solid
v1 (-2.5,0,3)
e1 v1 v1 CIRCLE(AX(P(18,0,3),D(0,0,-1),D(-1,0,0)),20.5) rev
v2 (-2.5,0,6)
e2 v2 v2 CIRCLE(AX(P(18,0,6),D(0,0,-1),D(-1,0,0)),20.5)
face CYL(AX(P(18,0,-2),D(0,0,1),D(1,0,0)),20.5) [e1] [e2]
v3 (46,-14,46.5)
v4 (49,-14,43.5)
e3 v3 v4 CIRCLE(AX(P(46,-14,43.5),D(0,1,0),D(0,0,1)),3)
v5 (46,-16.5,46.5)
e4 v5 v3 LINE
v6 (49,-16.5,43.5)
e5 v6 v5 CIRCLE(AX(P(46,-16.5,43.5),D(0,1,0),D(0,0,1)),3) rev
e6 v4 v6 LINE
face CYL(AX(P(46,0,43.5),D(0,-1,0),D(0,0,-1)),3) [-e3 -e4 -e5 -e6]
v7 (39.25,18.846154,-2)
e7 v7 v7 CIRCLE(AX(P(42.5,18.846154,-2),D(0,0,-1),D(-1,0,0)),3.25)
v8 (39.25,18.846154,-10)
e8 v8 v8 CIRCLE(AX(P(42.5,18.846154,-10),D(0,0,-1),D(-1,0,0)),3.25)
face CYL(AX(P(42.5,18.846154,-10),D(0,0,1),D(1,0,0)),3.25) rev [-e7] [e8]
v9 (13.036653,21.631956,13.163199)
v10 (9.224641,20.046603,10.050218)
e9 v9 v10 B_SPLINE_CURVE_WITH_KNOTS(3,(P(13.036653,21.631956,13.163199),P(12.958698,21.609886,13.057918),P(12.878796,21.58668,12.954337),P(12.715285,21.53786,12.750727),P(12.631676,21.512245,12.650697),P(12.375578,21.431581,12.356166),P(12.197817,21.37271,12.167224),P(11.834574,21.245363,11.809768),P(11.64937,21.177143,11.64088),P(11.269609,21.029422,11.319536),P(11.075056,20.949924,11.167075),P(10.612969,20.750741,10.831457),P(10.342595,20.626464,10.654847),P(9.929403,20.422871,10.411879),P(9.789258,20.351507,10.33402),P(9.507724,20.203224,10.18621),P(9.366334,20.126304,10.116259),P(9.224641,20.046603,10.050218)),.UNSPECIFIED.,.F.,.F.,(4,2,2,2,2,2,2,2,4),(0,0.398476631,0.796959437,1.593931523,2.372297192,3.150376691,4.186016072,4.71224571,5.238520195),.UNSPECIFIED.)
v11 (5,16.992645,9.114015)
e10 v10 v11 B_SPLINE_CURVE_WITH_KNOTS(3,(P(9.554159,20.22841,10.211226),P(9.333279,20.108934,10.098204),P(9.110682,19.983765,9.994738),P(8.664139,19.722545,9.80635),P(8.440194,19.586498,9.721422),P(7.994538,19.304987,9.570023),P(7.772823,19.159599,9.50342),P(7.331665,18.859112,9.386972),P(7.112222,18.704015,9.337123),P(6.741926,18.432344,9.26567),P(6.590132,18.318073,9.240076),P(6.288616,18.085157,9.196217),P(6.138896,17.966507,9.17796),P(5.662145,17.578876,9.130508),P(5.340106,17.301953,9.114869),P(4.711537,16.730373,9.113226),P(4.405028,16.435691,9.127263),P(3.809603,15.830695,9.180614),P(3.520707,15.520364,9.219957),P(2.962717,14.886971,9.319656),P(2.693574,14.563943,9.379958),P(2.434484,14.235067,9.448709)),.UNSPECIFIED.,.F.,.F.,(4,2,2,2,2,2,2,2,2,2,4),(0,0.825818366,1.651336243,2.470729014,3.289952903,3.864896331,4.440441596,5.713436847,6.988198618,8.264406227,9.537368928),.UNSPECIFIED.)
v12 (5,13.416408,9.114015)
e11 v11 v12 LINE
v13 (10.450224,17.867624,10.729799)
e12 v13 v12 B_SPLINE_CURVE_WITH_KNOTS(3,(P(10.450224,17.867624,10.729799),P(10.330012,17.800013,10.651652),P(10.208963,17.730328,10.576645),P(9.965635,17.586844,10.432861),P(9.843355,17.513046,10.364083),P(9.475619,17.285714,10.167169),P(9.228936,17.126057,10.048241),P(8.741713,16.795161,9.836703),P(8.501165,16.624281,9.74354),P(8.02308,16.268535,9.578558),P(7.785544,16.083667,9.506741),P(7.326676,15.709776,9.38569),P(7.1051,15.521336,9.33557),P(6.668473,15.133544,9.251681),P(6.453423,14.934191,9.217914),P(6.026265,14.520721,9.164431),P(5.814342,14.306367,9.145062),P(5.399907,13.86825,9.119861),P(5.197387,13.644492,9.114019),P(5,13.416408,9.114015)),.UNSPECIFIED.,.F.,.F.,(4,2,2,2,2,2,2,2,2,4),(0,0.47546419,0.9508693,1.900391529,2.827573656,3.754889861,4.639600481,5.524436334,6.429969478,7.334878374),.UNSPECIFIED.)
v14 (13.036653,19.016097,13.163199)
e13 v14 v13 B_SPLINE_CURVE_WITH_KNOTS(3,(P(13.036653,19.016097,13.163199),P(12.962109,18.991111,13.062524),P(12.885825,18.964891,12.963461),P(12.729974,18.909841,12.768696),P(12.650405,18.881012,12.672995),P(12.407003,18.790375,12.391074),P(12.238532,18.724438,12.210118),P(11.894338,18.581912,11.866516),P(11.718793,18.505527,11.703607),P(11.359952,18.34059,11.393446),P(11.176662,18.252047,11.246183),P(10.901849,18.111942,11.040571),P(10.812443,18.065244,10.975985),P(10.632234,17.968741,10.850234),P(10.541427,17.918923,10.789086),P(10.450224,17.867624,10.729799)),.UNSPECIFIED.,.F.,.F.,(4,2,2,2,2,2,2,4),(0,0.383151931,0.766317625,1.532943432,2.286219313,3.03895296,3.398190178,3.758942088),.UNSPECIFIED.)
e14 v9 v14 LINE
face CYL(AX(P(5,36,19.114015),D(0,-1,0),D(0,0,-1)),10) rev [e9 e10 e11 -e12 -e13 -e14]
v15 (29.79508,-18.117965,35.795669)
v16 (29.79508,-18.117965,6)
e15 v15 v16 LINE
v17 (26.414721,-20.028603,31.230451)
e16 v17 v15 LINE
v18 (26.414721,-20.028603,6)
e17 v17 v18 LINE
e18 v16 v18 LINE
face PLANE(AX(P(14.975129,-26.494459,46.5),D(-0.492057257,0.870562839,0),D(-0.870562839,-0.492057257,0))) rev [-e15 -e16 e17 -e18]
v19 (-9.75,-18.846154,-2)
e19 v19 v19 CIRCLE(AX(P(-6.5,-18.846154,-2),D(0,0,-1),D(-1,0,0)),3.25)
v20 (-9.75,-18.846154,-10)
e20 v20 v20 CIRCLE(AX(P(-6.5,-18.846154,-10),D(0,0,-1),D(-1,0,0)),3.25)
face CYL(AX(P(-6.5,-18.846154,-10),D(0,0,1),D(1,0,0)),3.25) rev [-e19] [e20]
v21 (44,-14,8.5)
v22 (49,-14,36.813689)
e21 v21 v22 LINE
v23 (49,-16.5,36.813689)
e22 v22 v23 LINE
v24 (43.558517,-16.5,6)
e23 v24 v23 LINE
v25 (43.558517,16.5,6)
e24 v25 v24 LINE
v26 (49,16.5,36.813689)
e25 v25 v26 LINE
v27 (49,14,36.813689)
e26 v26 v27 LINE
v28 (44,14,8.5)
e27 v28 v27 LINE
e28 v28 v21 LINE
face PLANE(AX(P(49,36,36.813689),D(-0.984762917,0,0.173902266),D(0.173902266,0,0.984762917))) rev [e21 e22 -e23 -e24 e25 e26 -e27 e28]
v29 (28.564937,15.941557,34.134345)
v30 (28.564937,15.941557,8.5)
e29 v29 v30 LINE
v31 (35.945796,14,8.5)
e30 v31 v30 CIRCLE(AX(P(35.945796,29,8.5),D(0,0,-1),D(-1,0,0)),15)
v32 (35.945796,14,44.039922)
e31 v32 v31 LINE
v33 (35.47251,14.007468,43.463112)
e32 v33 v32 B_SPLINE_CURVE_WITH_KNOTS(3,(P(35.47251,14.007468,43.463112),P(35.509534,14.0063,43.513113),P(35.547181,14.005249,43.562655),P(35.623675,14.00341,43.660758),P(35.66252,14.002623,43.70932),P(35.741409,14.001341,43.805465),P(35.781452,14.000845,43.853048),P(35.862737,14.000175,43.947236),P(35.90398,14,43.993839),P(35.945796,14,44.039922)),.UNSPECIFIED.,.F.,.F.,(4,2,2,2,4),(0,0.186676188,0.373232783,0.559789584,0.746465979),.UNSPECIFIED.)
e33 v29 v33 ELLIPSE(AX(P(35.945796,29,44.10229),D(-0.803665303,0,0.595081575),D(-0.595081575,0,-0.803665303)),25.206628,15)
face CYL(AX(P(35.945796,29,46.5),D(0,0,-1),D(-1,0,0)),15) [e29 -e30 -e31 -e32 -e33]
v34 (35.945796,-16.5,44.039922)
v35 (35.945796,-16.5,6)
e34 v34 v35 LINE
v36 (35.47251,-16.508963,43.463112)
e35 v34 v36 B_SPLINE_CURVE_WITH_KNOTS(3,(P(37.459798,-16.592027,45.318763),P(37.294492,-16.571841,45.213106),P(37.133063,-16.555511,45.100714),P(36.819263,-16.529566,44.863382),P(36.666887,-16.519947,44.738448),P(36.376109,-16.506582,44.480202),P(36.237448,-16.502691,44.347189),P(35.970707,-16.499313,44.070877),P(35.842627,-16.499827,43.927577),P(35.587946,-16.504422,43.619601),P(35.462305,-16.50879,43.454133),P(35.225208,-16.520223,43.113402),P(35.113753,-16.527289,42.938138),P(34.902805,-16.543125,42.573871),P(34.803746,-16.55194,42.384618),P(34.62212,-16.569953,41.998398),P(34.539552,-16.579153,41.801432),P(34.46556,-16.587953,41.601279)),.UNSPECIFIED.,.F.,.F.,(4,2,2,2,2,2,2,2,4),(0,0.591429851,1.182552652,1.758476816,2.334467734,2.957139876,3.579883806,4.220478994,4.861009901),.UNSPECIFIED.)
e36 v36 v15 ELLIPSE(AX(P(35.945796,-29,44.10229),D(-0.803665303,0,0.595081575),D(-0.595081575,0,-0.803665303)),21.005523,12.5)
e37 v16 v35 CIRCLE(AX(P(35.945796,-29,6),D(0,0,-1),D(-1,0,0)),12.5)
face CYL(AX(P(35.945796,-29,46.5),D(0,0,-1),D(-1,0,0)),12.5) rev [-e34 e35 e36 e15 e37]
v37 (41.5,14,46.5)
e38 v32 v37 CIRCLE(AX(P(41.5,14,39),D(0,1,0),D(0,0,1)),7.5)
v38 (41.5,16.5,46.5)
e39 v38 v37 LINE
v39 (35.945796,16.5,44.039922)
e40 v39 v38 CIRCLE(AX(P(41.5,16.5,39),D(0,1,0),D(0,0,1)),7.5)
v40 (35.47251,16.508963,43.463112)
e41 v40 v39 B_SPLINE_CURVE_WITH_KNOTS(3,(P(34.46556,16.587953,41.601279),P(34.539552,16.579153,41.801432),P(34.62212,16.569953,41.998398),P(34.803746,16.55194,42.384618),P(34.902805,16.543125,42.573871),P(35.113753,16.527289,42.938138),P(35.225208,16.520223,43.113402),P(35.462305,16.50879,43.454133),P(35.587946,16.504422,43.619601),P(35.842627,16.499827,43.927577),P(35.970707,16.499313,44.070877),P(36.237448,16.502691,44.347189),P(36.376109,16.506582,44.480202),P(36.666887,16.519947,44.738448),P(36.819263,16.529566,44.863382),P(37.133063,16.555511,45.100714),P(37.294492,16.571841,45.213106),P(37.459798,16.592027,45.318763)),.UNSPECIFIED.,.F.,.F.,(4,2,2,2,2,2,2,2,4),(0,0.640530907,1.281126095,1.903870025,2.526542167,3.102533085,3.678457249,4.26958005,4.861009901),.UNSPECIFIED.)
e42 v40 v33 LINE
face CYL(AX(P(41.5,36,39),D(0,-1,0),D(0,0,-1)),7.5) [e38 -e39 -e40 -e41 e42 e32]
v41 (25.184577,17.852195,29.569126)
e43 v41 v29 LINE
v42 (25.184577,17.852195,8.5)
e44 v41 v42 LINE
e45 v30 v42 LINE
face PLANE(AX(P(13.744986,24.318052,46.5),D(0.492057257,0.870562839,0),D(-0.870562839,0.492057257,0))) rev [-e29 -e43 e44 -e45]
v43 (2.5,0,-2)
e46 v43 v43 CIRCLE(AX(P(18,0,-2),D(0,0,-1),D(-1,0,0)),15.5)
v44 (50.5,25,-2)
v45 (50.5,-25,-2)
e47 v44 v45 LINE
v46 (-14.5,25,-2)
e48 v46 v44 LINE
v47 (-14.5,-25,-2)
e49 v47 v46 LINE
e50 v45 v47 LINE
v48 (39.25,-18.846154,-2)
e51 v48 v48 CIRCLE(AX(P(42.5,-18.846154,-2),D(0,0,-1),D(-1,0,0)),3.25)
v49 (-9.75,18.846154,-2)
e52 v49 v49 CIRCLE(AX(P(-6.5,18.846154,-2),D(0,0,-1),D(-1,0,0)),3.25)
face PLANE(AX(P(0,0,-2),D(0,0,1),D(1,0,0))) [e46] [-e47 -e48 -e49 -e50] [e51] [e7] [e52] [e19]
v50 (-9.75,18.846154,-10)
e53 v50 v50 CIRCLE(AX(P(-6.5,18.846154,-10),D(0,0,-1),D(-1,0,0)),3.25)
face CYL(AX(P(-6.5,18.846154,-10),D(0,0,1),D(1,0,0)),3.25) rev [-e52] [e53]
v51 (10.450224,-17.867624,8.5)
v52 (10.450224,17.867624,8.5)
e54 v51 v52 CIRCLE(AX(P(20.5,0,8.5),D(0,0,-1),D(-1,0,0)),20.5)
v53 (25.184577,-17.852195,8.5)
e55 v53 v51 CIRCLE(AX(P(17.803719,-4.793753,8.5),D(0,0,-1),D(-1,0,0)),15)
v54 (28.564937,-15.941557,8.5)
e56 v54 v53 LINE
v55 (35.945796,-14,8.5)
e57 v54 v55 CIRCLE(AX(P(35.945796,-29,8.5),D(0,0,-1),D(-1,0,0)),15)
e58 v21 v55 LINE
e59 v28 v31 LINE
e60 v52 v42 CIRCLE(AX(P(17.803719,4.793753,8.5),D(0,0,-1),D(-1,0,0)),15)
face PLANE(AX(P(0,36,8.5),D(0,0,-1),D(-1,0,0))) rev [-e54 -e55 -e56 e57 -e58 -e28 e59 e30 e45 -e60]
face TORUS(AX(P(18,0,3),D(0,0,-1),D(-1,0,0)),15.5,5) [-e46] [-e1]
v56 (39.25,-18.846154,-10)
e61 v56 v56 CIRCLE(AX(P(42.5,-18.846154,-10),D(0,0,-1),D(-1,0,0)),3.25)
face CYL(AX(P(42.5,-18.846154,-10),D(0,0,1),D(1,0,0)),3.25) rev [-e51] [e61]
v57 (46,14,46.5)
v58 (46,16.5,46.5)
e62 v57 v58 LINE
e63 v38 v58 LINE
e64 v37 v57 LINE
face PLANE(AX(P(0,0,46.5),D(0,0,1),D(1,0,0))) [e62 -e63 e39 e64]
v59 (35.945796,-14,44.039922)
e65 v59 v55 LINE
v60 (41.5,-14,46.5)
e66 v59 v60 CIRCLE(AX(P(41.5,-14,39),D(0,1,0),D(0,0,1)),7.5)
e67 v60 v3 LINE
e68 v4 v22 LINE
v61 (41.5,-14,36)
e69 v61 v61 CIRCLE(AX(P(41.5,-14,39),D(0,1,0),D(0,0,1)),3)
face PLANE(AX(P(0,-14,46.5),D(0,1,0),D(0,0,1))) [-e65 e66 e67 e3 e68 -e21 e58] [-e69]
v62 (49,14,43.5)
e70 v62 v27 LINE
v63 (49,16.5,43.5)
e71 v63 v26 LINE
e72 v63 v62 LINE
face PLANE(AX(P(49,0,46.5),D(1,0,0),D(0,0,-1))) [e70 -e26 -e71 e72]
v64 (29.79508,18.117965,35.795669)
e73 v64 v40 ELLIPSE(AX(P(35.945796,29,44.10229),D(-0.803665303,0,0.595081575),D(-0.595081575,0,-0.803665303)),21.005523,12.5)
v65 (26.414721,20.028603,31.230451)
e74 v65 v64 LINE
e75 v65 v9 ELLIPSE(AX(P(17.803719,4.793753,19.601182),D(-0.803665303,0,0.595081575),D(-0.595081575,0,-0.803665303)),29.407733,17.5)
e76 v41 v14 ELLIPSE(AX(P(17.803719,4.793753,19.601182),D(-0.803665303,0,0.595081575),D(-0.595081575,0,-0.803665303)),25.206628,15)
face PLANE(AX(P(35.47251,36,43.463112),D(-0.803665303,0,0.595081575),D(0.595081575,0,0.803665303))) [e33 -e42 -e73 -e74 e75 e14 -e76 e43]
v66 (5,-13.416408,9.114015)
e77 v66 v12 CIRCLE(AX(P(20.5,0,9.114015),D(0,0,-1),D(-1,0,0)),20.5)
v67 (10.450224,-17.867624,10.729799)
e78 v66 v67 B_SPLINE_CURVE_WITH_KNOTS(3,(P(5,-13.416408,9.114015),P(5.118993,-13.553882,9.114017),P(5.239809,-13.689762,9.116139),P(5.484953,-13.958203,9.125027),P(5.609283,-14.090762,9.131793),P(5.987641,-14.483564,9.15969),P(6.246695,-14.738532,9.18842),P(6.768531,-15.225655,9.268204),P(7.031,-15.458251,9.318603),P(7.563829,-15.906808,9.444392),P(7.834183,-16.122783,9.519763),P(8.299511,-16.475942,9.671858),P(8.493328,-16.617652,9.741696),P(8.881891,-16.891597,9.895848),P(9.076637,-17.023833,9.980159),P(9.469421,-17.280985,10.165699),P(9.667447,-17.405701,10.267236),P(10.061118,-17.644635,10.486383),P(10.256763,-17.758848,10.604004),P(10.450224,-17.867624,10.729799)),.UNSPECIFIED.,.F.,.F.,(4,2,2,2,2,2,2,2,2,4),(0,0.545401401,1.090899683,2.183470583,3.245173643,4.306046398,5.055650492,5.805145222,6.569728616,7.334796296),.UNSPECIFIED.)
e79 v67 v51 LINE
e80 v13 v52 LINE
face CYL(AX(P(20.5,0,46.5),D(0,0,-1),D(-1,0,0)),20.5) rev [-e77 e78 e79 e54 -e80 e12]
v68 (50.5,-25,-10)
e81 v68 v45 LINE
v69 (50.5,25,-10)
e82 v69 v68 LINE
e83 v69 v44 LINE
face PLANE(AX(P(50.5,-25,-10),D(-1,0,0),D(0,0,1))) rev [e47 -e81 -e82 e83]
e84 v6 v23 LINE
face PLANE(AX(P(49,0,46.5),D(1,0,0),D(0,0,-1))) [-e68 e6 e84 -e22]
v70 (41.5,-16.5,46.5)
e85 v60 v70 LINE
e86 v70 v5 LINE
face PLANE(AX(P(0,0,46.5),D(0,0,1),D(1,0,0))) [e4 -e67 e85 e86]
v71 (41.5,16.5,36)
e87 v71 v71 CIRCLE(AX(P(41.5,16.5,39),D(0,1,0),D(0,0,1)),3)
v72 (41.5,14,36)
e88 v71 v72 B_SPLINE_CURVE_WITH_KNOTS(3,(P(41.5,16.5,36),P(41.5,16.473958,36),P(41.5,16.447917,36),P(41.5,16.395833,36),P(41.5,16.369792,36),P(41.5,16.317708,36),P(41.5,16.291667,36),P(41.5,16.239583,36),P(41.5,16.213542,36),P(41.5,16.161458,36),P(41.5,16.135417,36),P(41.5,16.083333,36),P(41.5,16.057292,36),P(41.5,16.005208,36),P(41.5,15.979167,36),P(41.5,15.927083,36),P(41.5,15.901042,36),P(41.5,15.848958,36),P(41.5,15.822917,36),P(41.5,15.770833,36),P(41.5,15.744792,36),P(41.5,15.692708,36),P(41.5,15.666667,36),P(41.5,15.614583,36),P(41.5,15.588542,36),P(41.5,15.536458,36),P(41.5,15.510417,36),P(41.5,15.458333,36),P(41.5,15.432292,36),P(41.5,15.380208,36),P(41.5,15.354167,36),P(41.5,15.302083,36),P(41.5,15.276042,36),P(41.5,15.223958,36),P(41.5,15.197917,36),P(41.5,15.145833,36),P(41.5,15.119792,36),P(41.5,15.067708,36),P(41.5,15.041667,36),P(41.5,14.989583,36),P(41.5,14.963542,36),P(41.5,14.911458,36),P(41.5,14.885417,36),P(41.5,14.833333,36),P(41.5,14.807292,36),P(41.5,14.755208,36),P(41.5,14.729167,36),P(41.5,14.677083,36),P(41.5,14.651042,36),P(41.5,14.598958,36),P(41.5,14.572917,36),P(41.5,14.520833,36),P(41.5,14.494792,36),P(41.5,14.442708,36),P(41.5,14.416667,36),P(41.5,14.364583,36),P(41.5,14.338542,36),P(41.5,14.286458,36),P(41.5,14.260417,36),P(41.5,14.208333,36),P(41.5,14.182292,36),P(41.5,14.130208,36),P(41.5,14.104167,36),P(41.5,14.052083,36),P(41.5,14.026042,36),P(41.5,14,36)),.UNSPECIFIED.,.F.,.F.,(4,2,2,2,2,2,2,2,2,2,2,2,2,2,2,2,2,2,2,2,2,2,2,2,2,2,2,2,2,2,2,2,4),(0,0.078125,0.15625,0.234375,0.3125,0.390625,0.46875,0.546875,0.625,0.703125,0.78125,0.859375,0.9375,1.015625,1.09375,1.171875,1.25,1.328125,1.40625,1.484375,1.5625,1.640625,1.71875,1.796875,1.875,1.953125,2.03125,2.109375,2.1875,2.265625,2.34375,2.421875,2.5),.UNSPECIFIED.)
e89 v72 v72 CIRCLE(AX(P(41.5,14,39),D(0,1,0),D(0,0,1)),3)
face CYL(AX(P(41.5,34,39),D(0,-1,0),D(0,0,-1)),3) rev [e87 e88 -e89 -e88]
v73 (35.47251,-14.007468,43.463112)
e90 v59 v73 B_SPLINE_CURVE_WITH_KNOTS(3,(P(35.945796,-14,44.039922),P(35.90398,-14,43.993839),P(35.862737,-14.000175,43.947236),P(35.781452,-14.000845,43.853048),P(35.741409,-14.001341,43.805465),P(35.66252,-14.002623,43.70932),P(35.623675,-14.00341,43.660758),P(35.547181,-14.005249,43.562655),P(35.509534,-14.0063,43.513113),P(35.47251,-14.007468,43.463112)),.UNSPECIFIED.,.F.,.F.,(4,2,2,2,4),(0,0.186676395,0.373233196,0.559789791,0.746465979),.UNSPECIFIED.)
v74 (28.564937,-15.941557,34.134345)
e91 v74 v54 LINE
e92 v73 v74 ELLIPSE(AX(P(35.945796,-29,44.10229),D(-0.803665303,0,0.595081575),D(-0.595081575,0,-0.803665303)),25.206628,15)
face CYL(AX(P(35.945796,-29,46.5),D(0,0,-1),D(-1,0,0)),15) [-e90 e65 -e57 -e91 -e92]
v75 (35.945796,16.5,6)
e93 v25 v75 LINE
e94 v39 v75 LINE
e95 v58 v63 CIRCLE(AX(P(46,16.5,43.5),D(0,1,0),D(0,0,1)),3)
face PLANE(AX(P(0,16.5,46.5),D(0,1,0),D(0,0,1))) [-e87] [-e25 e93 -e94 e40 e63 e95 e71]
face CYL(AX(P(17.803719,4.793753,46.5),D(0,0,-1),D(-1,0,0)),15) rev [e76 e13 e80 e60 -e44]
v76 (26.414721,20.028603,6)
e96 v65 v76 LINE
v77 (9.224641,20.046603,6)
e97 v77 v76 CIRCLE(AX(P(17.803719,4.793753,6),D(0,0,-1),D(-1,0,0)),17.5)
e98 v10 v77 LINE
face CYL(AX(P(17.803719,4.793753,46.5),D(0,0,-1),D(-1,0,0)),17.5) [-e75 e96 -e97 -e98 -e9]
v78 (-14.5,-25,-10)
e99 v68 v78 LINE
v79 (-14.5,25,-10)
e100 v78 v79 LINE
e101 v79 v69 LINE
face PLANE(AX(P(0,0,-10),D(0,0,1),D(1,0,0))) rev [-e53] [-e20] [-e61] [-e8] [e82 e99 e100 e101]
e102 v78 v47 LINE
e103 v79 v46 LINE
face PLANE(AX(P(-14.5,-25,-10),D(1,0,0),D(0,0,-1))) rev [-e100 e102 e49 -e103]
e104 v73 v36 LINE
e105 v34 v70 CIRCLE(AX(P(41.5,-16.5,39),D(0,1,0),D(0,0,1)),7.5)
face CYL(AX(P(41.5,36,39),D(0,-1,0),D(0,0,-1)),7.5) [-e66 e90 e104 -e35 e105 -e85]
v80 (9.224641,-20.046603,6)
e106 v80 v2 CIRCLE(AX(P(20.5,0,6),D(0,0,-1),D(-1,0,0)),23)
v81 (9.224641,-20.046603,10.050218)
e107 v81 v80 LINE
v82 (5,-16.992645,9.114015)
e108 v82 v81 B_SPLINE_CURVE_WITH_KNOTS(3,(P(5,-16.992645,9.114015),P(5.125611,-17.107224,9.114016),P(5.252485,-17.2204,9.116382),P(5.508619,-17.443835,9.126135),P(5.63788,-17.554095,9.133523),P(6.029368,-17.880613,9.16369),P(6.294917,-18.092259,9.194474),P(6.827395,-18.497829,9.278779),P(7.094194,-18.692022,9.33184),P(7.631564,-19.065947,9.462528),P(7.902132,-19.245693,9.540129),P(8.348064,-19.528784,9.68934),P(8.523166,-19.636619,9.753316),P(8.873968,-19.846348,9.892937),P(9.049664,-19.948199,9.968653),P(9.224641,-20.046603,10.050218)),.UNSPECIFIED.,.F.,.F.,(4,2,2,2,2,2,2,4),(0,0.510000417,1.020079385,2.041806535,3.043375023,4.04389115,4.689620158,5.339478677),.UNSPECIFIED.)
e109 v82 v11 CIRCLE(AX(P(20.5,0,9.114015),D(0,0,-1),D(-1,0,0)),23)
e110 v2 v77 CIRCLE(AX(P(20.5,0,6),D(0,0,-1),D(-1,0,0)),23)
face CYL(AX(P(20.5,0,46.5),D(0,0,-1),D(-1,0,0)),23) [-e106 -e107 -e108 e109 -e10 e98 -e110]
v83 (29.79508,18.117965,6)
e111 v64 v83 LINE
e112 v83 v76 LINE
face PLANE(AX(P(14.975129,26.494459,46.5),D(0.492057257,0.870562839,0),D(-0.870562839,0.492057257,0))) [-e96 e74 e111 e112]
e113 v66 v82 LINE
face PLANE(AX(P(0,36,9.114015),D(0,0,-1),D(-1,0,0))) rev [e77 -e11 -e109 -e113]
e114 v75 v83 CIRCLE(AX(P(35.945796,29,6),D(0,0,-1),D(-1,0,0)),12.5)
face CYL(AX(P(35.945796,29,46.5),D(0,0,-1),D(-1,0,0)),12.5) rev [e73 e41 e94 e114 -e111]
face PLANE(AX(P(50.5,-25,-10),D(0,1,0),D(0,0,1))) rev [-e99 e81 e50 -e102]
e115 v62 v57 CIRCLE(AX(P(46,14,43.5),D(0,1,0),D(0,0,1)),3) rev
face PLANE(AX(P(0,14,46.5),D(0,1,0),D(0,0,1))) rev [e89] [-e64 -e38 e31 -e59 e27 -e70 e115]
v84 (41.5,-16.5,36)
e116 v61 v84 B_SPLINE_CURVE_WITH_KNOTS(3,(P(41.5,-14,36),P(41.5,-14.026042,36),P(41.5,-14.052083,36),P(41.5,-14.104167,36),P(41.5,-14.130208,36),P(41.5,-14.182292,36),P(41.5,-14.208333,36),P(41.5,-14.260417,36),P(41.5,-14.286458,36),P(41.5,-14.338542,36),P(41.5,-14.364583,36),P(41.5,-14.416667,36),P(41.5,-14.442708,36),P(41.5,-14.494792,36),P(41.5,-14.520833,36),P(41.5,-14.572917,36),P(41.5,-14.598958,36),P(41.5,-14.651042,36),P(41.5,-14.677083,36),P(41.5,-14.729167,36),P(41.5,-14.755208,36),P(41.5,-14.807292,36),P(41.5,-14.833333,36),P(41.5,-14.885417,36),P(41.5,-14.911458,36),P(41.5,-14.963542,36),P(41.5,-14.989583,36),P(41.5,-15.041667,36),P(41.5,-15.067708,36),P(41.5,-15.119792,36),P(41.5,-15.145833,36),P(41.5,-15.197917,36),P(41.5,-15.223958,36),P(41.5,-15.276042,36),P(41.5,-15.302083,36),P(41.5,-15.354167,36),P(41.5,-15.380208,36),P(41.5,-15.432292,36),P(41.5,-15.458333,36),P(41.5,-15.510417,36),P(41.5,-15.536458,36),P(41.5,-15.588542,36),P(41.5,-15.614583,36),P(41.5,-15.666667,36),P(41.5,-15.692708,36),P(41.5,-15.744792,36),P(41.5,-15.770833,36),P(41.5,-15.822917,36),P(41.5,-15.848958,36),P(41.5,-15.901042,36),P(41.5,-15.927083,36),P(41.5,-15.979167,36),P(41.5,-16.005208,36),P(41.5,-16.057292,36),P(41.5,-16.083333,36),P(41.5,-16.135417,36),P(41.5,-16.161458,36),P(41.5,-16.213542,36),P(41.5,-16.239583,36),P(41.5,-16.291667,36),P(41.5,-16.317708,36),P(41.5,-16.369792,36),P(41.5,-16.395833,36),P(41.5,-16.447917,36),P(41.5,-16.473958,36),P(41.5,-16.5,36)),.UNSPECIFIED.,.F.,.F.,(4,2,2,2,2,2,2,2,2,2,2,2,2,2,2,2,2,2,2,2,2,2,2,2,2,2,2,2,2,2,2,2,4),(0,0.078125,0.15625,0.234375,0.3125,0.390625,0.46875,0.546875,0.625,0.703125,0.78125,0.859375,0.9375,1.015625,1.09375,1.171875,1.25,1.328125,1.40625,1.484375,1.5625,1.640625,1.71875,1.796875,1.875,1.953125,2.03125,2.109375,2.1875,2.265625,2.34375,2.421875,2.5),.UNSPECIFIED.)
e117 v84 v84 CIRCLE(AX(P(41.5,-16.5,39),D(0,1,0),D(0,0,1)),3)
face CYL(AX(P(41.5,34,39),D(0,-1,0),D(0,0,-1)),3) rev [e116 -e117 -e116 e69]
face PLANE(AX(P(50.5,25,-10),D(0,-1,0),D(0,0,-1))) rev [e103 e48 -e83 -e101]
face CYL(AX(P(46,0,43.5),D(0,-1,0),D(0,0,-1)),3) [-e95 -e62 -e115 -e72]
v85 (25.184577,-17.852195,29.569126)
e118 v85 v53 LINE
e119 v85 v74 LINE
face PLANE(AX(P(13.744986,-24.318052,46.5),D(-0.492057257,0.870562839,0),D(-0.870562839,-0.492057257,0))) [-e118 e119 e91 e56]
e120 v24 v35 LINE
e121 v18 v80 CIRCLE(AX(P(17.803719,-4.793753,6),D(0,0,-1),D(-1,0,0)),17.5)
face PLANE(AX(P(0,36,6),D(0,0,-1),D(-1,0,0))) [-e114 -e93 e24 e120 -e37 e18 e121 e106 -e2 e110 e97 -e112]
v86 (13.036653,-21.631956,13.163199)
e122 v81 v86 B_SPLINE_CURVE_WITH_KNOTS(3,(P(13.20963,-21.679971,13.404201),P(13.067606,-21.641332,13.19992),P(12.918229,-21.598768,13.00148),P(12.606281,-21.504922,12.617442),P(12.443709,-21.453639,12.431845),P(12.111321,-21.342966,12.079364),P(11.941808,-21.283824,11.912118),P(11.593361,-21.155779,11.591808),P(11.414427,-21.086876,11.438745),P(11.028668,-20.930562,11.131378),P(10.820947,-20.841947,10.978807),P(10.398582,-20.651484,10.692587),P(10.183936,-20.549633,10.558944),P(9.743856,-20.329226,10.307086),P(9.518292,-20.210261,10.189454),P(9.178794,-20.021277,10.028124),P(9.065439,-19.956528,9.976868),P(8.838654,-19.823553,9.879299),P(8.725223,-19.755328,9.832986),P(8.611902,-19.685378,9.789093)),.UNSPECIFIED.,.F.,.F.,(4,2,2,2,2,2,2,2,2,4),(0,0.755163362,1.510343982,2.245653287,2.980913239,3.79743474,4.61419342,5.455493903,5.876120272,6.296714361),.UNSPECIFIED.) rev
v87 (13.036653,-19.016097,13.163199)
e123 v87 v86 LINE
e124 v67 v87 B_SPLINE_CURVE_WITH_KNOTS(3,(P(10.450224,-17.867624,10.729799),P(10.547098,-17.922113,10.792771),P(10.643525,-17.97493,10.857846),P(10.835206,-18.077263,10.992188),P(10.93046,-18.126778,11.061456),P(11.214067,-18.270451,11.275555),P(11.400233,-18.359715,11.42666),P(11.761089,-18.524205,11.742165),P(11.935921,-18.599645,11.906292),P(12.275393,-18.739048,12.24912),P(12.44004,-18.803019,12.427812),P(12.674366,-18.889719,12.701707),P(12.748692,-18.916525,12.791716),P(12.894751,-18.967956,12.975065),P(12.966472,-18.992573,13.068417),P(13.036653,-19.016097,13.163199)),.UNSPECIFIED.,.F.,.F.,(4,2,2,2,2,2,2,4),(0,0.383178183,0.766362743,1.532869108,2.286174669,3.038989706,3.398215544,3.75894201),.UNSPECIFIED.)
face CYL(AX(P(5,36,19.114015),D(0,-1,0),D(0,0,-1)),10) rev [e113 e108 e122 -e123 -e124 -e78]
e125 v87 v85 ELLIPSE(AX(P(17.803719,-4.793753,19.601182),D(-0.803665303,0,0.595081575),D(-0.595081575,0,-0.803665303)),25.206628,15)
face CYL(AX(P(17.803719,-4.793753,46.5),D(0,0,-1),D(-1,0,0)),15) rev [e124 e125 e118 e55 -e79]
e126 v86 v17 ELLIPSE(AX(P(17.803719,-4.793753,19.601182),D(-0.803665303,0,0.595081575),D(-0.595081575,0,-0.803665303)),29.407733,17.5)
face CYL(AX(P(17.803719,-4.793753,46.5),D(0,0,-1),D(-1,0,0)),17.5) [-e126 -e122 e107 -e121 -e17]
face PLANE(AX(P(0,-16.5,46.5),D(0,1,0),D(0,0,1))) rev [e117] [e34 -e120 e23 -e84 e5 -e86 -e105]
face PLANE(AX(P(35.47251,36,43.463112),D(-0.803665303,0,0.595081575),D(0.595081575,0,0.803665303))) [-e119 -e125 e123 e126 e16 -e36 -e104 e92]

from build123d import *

# Parameters (mm, degrees)
EXTRUDE_1_DEPTH     = 46.5
SKETCH_4_OUTSIDE_W  = 66.66
SKETCH_4_OUTSIDE_H  = 64.16
CUT_EXTRUDE_1_DEPTH = 50
SHELL_START         = 6
SHELL_1_DEPTH       = 40.5
SHELL_START_2       = 8.5
SHELL_1_2_DEPTH     = 38
SHELL_START_3       = -22.293752824
SHELL_1_3_DEPTH     = 44.587505647
SKETCH_5_R          = 20.5
EXTRUDE_3_DEPTH     = 8
FILLET_1_R          = 5
SKETCH_4_8_R        = 3
CUT_EXTRUDE_3_DEPTH = 48
FILLET_3_R          = 3
SKETCH_8_W          = 65
SKETCH_8_H          = 50
SKETCH_8_R          = 3.25
EXTRUDE_4_DEPTH     = 8


with BuildPart() as part:
    # 草图1 → 凸台-拉伸1 (new body)
    with BuildSketch(Plane.XY):
        with BuildLine():
            ThreePointArc((35.945795724, -14), (32.1298187, -14.493507683), (28.564936874, -15.941557419))
            Line((28.564936874, -15.941557419), (25.184577361, -17.852195404))
            ThreePointArc((25.184577361, -17.852195404), (17.819425425, -19.7937446), (10.450223542, -17.867624161))
            ThreePointArc((10.450223542, -17.867624161), (0, 0), (10.450223542, 17.867624161))
            ThreePointArc((10.450223542, 17.867624161), (17.819425425, 19.7937446), (25.184577361, 17.852195404))
            Line((25.184577361, 17.852195404), (28.564936874, 15.941557419))
            ThreePointArc((28.564936874, 15.941557419), (32.1298187, 14.493507683), (35.945795724, 14))
            Line((35.945795724, 14), (49, 14))
            Line((49, 14), (49, -14))
            Line((49, -14), (35.945795724, -14))
        make_face()
    extrude(amount=EXTRUDE_1_DEPTH)

    # 草图4 outside → 切除-拉伸1 (cut, symmetric)
    with BuildSketch(Plane.XZ.offset(14)):
        with Locations((24.5, 23.25)):
            Rectangle(SKETCH_4_OUTSIDE_W, SKETCH_4_OUTSIDE_H)
        with BuildLine():
            Line((49, 36.813688531), (44, 8.5))
            Line((44, 8.5), (0, 8.5))
            Line((0, 8.5), (0, 9.114014501))
            Line((0, 9.114014501), (5, 9.114014501))
            ThreePointArc((5, 9.114014501), (9.499546785, 10.183500589), (13.036653031, 13.163198754))
            Line((13.036653031, 13.163198754), (35.472510226, 43.46311181))
            ThreePointArc((35.472510226, 43.46311181), (38.125339912, 45.697885434), (41.5, 46.5))
            Line((41.5, 46.5), (49, 46.5))
            Line((49, 46.5), (49, 36.813688531))
        make_face(mode=Mode.SUBTRACT)
    extrude(amount=CUT_EXTRUDE_1_DEPTH, both=True, mode=Mode.SUBTRACT)

    # 抽壳1: read off the stored shape, not the designer's step
    # 抽壳1 outline → 抽壳1 (add)
    with BuildSketch(Plane.XY.offset(SHELL_START)):
        with BuildLine():
            Line((49, -16.5), (49, 16.5))
            Line((49, 16.5), (35.945796372, 16.5))
            ThreePointArc((35.945796372, 16.5), (32.765815184, 16.91125632), (29.795080015, 18.117964516))
            Line((29.795080015, 18.117964516), (26.414720503, 20.028602501))
            ThreePointArc((26.414720503, 20.028602501), (17.822043244, 22.293743229), (9.224641048, 20.046602717))
            ThreePointArc((9.224641048, 20.046602717), (-2.5, 3.232e-06), (9.224641048, -20.046602717))
            ThreePointArc((9.224641048, -20.046602717), (17.822043244, -22.293743229), (26.414720503, -20.028602501))
            Line((26.414720503, -20.028602501), (29.795080015, -18.117964516))
            ThreePointArc((29.795080015, -18.117964516), (32.765815184, -16.91125632), (35.945796372, -16.5))
            Line((35.945796372, -16.5), (49, -16.5))
        make_face()
    extrude(amount=SHELL_1_DEPTH)

    # Shell 1 2 outline → Shell 1 2 (cut)
    with BuildSketch(Plane.XY.offset(SHELL_START_2)):
        with BuildLine():
            Line((25.184577361, -17.852195404), (28.564936874, -15.941557419))
            ThreePointArc((28.564936874, -15.941557419), (32.129818701, -14.493507683), (35.945795724, -14))
            Line((35.945795724, -14), (49, -14))
            Line((49, -14), (49, 14))
            Line((49, 14), (35.945795724, 14))
            ThreePointArc((35.945795724, 14), (32.129818701, 14.493507683), (28.564936874, 15.941557419))
            Line((28.564936874, 15.941557419), (25.184577361, 17.852195404))
            ThreePointArc((25.184577361, 17.852195404), (17.819425424, 19.7937446), (10.450223542, 17.867624161))
            ThreePointArc((10.450223542, 17.867624161), (0, 0), (10.450223542, -17.867624161))
            ThreePointArc((10.450223542, -17.867624161), (17.819425424, -19.7937446), (25.184577361, -17.852195404))
        make_face()
    extrude(amount=SHELL_1_2_DEPTH, mode=Mode.SUBTRACT)

    # Shell 1 3 outline → Shell 1 3 (cut)
    with BuildSketch(Plane(origin=(0, 0, 0), x_dir=(1, 0, 0), z_dir=(0, 1, 0)).offset(SHELL_START_3)):
        with BuildLine():
            Line((-4, -46.5), (41.5, -46.5))
            ThreePointArc((41.5, -46.5), (38.125339907, -45.697885432), (35.47251022, -43.463111802))
            Line((35.47251022, -43.463111802), (13.036653031, -13.163198754))
            ThreePointArc((13.036653031, -13.163198754), (9.499546673, -10.183500533), (4.999999751, -9.114014501))
            Line((4.999999751, -9.114014501), (-4, -9.114014501))
            Line((-4, -9.114014501), (-4, -46.5))
        make_face()
        Polygon((49, -36.813688531), (49, -6), (43.558517429, -6), align=None)
    extrude(amount=SHELL_1_3_DEPTH, mode=Mode.SUBTRACT)

    # 草图5 → 凸台-拉伸3 (add)
    with BuildSketch(Plane(origin=(0, 0, 6), x_dir=(-1, 0, 0), z_dir=(0, 0, -1))):
        with Locations(Location((-18, 0, 0), (0, 0, 359.999469823))):
            Circle(SKETCH_5_R)
    extrude(amount=EXTRUDE_3_DEPTH)

    # 圆角1
    fillet_1_edges = [part.edges().sort_by_distance(p)[0] for p in [
        (38.499999999, 0.000189693, -2),
    ]]
    fillet(fillet_1_edges, radius=FILLET_1_R)

    # 草图4<8> → 切除-拉伸3 (cut, symmetric)
    with BuildSketch(Plane.XZ.offset(14)):
        with Locations(Location((41.5, 39, 0), (0, 0, 270))):
            Circle(SKETCH_4_8_R)
    extrude(amount=CUT_EXTRUDE_3_DEPTH, both=True, mode=Mode.SUBTRACT)

    # 圆角3
    fillet_3_edges = [part.edges().sort_by_distance(p)[0] for p in [
        (49, -15.25, 46.5),
        (49, 15.25, 46.5),
    ]]
    fillet(fillet_3_edges, radius=FILLET_3_R)

    # 草图8 → 凸台-拉伸4 (add)
    with BuildSketch(Plane(origin=(0, 0, -2), x_dir=(-1, 0, 0), z_dir=(0, 0, -1))):
        with Locations((-18, 0)):
            Rectangle(SKETCH_8_W, SKETCH_8_H)
        with Locations((6.5, 18.846153846)):
            Circle(SKETCH_8_R, mode=Mode.SUBTRACT)
        with Locations((6.5, -18.846153846)):
            Circle(SKETCH_8_R, mode=Mode.SUBTRACT)
        with Locations((-42.5, -18.846153846)):
            Circle(SKETCH_8_R, mode=Mode.SUBTRACT)
        with Locations((-42.5, 18.846153846)):
            Circle(SKETCH_8_R, mode=Mode.SUBTRACT)
    extrude(amount=EXTRUDE_4_DEPTH)


solid = part.part
